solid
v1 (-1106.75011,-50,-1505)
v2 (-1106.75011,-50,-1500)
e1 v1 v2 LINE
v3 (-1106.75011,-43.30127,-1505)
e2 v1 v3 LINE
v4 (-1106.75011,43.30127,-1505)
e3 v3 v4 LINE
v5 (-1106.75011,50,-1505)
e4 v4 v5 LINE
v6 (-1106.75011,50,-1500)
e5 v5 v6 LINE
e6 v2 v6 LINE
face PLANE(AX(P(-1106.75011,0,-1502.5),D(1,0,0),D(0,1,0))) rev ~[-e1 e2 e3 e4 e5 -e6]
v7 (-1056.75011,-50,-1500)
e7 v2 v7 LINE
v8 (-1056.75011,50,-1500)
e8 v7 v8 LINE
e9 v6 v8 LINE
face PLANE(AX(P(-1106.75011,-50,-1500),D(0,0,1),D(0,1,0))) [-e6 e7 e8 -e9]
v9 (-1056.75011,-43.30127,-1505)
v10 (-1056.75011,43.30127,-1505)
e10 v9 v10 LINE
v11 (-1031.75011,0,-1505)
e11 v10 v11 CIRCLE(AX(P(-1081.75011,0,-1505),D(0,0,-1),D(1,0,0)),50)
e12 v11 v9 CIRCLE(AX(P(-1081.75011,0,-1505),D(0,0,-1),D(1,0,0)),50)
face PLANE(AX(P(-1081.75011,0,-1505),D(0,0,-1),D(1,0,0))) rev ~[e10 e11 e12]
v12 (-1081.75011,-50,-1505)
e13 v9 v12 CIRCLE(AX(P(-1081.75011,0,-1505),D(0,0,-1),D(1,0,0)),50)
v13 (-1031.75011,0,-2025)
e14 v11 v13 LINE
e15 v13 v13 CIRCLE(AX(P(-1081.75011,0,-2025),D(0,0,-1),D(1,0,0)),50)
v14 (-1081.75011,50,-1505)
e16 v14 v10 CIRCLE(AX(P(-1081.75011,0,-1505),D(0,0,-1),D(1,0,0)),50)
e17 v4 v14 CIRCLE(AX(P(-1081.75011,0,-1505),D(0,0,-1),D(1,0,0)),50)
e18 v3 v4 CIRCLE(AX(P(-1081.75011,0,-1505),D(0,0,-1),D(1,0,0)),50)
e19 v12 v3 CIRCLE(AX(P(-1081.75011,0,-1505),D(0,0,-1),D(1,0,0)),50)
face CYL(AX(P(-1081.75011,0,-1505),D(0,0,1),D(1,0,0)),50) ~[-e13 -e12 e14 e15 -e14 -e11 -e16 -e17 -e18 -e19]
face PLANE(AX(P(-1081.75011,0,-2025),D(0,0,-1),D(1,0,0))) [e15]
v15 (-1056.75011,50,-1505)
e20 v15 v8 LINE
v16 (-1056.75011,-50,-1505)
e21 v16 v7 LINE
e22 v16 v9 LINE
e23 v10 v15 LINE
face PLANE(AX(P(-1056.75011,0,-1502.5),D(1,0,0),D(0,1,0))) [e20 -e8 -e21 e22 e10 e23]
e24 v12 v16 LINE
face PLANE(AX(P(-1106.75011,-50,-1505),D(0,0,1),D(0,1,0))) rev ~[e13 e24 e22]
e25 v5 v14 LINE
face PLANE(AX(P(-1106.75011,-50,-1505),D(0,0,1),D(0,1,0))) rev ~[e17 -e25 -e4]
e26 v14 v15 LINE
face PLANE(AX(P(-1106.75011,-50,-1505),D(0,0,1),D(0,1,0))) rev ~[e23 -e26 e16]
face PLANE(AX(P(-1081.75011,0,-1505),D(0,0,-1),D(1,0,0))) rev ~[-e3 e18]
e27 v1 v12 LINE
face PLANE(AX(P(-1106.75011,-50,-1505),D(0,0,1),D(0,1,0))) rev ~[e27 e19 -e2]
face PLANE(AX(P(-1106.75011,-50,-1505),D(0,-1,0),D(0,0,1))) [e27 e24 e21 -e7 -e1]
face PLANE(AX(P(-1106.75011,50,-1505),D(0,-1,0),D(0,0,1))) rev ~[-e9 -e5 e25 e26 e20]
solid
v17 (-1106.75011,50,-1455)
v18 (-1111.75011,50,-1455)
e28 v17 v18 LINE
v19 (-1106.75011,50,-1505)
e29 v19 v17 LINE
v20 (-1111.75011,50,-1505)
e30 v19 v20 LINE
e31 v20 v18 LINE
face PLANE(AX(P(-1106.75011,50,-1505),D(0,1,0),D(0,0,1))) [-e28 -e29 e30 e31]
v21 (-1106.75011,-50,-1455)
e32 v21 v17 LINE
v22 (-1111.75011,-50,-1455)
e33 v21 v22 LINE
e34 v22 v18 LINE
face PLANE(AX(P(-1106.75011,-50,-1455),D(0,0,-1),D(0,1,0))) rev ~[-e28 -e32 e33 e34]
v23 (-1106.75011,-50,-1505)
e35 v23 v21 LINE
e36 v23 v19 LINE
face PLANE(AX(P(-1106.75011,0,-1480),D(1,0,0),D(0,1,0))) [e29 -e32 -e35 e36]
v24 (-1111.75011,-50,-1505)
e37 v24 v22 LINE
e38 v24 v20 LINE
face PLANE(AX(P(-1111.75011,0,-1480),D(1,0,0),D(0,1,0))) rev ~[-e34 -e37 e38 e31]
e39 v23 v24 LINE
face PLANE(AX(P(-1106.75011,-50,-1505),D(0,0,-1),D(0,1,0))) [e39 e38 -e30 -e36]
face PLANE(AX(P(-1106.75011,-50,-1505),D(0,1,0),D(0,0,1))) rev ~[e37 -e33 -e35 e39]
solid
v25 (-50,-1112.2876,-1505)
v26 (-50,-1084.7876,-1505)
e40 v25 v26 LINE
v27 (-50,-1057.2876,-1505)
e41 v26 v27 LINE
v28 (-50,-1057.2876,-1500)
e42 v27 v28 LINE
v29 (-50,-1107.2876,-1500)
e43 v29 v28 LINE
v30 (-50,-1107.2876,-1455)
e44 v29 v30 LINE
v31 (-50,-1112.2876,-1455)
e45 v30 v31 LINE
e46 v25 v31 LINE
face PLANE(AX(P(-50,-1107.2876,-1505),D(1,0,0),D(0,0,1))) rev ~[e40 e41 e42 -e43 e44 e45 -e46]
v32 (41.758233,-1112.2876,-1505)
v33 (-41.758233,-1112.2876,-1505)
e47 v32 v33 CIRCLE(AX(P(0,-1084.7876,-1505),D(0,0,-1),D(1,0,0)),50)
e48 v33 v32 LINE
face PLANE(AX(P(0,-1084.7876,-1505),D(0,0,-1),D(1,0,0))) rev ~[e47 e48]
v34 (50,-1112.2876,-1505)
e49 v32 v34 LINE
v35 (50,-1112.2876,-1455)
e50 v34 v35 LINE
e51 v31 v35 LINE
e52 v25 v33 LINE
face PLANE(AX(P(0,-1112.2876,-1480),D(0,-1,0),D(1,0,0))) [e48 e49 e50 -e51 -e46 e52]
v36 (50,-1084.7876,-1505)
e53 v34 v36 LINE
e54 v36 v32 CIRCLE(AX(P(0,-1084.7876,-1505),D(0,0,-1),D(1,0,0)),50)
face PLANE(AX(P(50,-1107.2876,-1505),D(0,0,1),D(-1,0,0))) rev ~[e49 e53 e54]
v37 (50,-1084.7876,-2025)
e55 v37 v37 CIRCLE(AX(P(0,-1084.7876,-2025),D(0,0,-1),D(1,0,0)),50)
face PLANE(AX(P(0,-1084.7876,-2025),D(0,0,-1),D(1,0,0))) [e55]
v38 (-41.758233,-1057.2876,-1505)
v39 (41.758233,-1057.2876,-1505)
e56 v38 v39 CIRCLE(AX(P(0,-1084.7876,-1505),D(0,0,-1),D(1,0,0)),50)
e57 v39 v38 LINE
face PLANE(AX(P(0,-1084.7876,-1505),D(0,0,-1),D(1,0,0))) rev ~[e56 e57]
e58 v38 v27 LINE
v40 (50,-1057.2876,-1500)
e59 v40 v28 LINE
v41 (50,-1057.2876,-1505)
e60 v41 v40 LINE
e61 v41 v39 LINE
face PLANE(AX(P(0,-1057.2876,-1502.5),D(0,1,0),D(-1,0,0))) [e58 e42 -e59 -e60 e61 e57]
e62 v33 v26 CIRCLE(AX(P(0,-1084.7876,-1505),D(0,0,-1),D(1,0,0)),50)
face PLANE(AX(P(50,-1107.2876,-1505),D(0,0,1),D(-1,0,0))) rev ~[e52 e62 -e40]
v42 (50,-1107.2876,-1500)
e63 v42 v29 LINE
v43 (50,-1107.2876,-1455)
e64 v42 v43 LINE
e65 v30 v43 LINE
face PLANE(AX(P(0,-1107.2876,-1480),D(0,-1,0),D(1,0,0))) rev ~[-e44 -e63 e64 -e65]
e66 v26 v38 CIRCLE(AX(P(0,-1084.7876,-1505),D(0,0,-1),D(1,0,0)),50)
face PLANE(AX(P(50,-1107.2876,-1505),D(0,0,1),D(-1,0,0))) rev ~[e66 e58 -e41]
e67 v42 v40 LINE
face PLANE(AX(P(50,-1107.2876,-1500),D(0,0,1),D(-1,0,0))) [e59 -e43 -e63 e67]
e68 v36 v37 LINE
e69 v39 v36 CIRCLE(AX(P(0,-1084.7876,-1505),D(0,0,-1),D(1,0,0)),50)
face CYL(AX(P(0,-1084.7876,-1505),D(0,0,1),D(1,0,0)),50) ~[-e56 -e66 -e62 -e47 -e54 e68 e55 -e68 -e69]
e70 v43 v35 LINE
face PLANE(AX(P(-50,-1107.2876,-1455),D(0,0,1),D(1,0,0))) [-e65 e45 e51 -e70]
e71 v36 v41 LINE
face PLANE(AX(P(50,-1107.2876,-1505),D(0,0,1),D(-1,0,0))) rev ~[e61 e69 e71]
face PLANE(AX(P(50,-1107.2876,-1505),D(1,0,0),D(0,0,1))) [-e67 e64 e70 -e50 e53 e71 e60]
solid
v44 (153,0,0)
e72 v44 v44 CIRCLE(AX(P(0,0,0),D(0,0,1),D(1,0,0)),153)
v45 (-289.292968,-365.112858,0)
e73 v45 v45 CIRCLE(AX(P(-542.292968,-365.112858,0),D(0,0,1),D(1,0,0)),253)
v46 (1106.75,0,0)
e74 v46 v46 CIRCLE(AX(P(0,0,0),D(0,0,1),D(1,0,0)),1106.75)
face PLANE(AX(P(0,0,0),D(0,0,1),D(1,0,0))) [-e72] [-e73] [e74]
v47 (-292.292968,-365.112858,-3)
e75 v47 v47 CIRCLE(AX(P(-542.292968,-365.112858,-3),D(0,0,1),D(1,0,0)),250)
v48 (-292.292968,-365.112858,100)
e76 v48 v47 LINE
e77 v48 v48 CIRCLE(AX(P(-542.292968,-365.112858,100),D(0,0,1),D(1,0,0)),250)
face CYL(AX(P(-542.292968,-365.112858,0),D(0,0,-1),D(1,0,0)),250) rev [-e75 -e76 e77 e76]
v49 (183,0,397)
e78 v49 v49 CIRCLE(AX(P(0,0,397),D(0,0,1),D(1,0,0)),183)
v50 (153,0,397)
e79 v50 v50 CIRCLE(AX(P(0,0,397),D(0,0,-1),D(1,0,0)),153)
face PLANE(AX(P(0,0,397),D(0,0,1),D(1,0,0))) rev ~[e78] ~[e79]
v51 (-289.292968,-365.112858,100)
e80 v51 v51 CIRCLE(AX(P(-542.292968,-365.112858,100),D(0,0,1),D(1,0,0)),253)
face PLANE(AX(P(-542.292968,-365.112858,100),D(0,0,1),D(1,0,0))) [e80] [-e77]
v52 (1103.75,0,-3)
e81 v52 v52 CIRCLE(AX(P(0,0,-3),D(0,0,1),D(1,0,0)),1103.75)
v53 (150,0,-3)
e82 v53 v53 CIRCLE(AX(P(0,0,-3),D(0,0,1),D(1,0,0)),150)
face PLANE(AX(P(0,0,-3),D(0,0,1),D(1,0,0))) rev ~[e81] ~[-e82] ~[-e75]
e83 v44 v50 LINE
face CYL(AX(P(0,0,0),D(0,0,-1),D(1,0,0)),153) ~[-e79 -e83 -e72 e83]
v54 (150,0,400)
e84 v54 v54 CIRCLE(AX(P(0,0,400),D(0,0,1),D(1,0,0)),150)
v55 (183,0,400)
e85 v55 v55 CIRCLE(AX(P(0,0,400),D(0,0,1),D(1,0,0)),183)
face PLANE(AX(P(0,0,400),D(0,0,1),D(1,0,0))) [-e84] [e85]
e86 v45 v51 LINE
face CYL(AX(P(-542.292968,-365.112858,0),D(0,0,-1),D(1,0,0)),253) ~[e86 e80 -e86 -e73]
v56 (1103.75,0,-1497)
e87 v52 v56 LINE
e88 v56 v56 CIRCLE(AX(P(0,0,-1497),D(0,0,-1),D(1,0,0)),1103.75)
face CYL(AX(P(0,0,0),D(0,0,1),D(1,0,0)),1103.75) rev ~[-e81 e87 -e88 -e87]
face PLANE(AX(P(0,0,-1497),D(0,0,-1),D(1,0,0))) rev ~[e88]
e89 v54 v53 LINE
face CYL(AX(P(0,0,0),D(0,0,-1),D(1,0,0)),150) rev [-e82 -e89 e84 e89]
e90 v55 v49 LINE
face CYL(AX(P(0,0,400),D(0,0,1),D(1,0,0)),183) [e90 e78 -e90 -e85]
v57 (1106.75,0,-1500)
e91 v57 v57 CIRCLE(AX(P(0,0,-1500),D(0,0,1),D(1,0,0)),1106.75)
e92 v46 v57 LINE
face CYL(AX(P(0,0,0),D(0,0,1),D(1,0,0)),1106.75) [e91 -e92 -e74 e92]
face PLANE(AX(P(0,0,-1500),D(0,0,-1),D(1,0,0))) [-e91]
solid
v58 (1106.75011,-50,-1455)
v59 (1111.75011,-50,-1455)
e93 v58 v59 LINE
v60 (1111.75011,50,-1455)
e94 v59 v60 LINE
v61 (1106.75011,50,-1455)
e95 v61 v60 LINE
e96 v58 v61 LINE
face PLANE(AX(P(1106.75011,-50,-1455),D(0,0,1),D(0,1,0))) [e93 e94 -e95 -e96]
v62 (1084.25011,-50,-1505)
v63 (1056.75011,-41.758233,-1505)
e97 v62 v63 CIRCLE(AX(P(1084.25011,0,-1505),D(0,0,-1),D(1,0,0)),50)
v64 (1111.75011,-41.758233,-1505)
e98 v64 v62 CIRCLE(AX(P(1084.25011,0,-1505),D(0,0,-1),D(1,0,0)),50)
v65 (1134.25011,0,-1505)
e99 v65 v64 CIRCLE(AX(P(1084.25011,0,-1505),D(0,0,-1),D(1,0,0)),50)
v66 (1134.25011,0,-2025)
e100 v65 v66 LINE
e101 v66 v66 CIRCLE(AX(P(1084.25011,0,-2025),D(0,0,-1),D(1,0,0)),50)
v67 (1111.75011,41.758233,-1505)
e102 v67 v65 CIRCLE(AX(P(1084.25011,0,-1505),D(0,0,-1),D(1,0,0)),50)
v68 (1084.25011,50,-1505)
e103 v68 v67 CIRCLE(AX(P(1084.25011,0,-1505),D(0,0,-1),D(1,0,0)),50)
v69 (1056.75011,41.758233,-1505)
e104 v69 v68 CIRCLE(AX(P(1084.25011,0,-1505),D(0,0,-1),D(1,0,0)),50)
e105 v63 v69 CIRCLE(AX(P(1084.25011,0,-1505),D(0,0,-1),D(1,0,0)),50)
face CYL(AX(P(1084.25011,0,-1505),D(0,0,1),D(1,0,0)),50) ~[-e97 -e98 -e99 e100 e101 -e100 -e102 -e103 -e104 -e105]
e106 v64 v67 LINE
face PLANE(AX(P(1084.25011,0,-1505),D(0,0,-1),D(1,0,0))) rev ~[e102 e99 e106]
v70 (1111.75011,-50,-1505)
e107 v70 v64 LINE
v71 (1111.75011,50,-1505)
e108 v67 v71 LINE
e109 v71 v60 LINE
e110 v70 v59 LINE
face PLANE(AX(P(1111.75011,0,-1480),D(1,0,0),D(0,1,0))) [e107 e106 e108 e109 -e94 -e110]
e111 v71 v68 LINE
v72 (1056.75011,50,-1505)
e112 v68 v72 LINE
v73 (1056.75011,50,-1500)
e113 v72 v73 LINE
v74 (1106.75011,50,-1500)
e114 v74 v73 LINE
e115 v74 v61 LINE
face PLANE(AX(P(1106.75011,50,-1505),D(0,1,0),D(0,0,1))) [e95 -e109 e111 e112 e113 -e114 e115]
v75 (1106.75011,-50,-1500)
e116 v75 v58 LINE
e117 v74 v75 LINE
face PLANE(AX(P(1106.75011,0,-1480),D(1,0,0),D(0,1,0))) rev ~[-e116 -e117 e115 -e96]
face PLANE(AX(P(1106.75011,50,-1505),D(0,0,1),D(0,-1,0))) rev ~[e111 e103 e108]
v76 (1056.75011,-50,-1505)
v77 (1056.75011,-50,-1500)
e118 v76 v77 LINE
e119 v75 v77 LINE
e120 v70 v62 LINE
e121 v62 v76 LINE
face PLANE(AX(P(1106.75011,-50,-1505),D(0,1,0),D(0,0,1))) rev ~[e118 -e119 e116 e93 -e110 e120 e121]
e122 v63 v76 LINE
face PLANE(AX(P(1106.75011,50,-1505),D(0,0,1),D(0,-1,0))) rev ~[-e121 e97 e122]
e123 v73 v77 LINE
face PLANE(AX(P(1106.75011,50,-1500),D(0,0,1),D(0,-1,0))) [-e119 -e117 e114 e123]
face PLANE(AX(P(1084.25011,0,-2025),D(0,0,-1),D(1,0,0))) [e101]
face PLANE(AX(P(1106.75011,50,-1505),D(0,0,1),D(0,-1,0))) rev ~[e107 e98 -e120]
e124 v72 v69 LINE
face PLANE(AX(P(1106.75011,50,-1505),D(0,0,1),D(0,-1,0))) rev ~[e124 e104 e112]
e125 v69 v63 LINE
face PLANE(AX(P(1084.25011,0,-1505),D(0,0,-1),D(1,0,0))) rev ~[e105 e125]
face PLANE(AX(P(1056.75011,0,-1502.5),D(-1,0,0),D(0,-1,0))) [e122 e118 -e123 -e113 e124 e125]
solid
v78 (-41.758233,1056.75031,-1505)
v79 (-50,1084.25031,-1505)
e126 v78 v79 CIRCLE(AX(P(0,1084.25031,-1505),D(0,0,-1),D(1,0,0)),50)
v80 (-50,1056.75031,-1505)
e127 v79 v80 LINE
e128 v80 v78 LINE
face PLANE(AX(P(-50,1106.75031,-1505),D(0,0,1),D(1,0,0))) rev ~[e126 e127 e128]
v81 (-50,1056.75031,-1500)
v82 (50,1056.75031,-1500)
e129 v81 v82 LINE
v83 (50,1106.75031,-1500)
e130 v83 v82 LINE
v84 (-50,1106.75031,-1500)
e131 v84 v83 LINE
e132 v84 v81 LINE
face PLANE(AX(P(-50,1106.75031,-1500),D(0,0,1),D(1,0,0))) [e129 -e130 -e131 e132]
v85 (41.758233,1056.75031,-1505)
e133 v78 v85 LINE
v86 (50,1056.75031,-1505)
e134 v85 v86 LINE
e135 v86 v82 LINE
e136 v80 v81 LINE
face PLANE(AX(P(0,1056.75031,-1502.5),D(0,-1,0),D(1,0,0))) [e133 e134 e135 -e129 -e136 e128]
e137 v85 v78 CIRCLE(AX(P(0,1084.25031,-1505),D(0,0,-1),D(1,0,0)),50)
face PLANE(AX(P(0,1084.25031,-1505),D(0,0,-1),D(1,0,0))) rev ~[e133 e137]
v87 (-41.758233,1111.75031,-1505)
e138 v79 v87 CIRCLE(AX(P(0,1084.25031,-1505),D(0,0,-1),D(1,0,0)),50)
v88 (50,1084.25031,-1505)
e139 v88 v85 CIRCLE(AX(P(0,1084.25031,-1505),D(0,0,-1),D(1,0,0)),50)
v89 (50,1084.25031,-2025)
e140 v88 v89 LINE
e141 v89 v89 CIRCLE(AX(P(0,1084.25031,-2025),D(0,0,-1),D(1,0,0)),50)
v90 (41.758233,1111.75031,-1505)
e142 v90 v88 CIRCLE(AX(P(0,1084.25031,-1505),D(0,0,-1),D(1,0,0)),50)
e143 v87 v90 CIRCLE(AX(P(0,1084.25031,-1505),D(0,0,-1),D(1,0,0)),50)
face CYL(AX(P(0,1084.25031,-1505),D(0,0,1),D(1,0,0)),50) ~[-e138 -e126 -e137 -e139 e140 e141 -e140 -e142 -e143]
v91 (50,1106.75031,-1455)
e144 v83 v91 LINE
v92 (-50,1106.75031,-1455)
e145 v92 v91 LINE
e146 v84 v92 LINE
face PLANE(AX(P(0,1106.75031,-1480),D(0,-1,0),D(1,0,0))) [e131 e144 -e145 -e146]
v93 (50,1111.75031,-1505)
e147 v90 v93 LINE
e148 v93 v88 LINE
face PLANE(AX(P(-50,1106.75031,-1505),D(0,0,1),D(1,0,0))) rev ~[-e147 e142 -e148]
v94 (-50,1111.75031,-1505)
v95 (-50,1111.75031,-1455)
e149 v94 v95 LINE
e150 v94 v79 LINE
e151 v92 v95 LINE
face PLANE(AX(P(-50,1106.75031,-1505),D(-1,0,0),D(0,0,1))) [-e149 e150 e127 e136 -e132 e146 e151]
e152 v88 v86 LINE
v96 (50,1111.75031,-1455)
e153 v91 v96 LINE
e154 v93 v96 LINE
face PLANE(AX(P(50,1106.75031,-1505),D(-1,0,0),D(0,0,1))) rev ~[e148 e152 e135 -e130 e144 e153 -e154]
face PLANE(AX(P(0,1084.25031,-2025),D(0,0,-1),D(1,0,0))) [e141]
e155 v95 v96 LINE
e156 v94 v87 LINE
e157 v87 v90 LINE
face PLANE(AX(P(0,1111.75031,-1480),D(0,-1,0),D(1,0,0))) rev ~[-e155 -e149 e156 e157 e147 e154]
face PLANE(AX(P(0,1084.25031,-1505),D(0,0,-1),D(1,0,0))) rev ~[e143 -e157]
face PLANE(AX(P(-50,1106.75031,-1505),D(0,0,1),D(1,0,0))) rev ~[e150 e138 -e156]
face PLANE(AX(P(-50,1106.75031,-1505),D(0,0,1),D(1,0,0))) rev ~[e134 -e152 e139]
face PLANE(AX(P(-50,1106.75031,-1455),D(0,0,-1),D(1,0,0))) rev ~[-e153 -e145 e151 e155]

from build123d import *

# Parameters (mm, degrees)
F0_R      = 1106.75
F0_R_2    = 1103.75
F1_DEPTH  = 1500
F2_R      = 1103.75
F3_DEPTH  = 3
F4_R      = 1103.75
F4_R_2    = 250
F4_R_3    = 150
F5_DEPTH  = 3
F6_R      = 253
F6_R_2    = 250
F7_DEPTH  = 100
F8_R      = 153
F8_R_2    = 150
F9_DEPTH  = 400
F10_R     = 183
F10_R_2   = 150
F11_DEPTH = 3
F13_W     = 100
F13_H     = 50
F14_DEPTH = 5
F15_W     = 100
F15_H     = 5
F16_DEPTH = 50
F18_W     = 100
F18_H     = 50
F19_DEPTH = 5
F20_W     = 100
F20_H     = 5
F21_DEPTH = 50
F23_W     = 100
F23_H     = 50
F24_DEPTH = 5
F25_W     = 100
F25_H     = 5
F26_DEPTH = 50
F28_W     = 100
F28_H     = 50
F29_DEPTH = 5
F30_W     = 100
F30_H     = 5
F31_DEPTH = 50
F32_R     = 50
F33_DEPTH = 520
F34_R     = 50
F35_DEPTH = 520
F36_R     = 50
F37_DEPTH = 520
F38_R     = 50
F39_DEPTH = 520


with BuildPart() as f1:
    # F0 (on Top) → F1 (new body)
    with BuildSketch(Plane.XY):
        Circle(F0_R)
        Circle(F0_R_2, mode=Mode.SUBTRACT)
    extrude(amount=-F1_DEPTH)

    # F2 (on face) → F3 (join)
    with BuildSketch(Plane(origin=(0, 0, -1500), x_dir=(1, 0, 0), z_dir=(0, 0, -1))):
        Circle(F2_R)
    extrude(amount=-F3_DEPTH)

    # F4 (on face) → F5 (join)
    with BuildSketch(Plane.XY):
        Circle(F4_R)
        with Locations((-542.2929684516, -365.1128577139)):
            Circle(F4_R_2, mode=Mode.SUBTRACT)
        Circle(F4_R_3, mode=Mode.SUBTRACT)
    extrude(amount=-F5_DEPTH)

    # F6 (on face) → F7 (join)
    with BuildSketch(Plane.XY):
        with Locations((-542.2929684516, -365.1128577139)):
            Circle(F6_R)
        with Locations((-542.2929684516, -365.1128577139)):
            Circle(F6_R_2, mode=Mode.SUBTRACT)
    extrude(amount=F7_DEPTH)

    # F8 (on face) → F9 (join)
    with BuildSketch(Plane.XY):
        Circle(F8_R)
        Circle(F8_R_2, mode=Mode.SUBTRACT)
    extrude(amount=F9_DEPTH)

    # F10 (on face) → F11 (join)
    with BuildSketch(Plane.XY.offset(400)):
        Circle(F10_R)
        Circle(F10_R_2, mode=Mode.SUBTRACT)
    extrude(amount=-F11_DEPTH)


with BuildPart() as f14:
    # F13 (on offset) → F14 (new body)
    with BuildSketch(Plane.XZ.offset(1107.2876)):
        with Locations((0, -1480)):
            Rectangle(F13_W, F13_H)
    extrude(amount=F14_DEPTH)

    # F15 (on face) → F16 (join)
    with BuildSketch(Plane(origin=(0, -1107.2876, 0), x_dir=(-1, 0, 0), z_dir=(0, 1, 0))):
        with Locations((0, -1502.5)):
            Rectangle(F15_W, F15_H)
    extrude(amount=F16_DEPTH)

    # F36 (on face) → F37 (join)
    with BuildSketch(Plane(origin=(0, 0, -1505), x_dir=(1, 0, 0), z_dir=(0, 0, -1))):
        with Locations((0, 1084.7876)):
            Circle(F36_R)
    extrude(amount=F37_DEPTH)


with BuildPart() as f19:
    # F18 (on offset) → F19 (new body)
    with BuildSketch(Plane.XZ.offset(-1106.75031)):
        with Locations((0, -1480)):
            Rectangle(F18_W, F18_H)
    extrude(amount=-F19_DEPTH)

    # F20 (on face) → F21 (join)
    with BuildSketch(Plane.XZ.offset(-1106.75031)):
        with Locations((0, -1502.5)):
            Rectangle(F20_W, F20_H)
    extrude(amount=F21_DEPTH)

    # F32 (on face) → F33 (join)
    with BuildSketch(Plane(origin=(0, 0, -1505), x_dir=(1, 0, 0), z_dir=(0, 0, -1))):
        with Locations((0, -1084.25031)):
            Circle(F32_R)
    extrude(amount=F33_DEPTH)


with BuildPart() as f24:
    # F23 (on offset) → F24 (new body)
    with BuildSketch(Plane.YZ.offset(1106.75011)):
        with Locations((0, -1480)):
            Rectangle(F23_W, F23_H)
    extrude(amount=F24_DEPTH)

    # F25 (on face) → F26 (join)
    with BuildSketch(Plane(origin=(1106.75011, 0, 0), x_dir=(0, -1, 0), z_dir=(-1, 0, 0))):
        with Locations((0, -1502.5)):
            Rectangle(F25_W, F25_H)
    extrude(amount=F26_DEPTH)

    # F34 (on face) → F35 (join)
    with BuildSketch(Plane(origin=(0, 0, -1505), x_dir=(1, 0, 0), z_dir=(0, 0, -1))):
        with Locations((1084.25011, 0)):
            Circle(F34_R)
    extrude(amount=F35_DEPTH)


with BuildPart() as f29:
    # F28 (on offset) → F29 (new body)
    with BuildSketch(Plane.YZ.offset(-1106.75011)):
        with Locations((0, -1480)):
            Rectangle(F28_W, F28_H)
    extrude(amount=-F29_DEPTH)


with BuildPart() as f31:
    # F30 (on face) → F31 (new body)
    with BuildSketch(Plane.YZ.offset(-1106.75011)):
        with Locations((0, -1502.5)):
            Rectangle(F30_W, F30_H)
    extrude(amount=F31_DEPTH)

    # F38 (on face) → F39 (join)
    with BuildSketch(Plane(origin=(0, 0, -1505), x_dir=(1, 0, 0), z_dir=(0, 0, -1))):
        with Locations((-1081.75011, 0)):
            Circle(F38_R)
    extrude(amount=F39_DEPTH)


solid = Compound([f1.part, f14.part, f19.part, f24.part, f29.part, f31.part])
